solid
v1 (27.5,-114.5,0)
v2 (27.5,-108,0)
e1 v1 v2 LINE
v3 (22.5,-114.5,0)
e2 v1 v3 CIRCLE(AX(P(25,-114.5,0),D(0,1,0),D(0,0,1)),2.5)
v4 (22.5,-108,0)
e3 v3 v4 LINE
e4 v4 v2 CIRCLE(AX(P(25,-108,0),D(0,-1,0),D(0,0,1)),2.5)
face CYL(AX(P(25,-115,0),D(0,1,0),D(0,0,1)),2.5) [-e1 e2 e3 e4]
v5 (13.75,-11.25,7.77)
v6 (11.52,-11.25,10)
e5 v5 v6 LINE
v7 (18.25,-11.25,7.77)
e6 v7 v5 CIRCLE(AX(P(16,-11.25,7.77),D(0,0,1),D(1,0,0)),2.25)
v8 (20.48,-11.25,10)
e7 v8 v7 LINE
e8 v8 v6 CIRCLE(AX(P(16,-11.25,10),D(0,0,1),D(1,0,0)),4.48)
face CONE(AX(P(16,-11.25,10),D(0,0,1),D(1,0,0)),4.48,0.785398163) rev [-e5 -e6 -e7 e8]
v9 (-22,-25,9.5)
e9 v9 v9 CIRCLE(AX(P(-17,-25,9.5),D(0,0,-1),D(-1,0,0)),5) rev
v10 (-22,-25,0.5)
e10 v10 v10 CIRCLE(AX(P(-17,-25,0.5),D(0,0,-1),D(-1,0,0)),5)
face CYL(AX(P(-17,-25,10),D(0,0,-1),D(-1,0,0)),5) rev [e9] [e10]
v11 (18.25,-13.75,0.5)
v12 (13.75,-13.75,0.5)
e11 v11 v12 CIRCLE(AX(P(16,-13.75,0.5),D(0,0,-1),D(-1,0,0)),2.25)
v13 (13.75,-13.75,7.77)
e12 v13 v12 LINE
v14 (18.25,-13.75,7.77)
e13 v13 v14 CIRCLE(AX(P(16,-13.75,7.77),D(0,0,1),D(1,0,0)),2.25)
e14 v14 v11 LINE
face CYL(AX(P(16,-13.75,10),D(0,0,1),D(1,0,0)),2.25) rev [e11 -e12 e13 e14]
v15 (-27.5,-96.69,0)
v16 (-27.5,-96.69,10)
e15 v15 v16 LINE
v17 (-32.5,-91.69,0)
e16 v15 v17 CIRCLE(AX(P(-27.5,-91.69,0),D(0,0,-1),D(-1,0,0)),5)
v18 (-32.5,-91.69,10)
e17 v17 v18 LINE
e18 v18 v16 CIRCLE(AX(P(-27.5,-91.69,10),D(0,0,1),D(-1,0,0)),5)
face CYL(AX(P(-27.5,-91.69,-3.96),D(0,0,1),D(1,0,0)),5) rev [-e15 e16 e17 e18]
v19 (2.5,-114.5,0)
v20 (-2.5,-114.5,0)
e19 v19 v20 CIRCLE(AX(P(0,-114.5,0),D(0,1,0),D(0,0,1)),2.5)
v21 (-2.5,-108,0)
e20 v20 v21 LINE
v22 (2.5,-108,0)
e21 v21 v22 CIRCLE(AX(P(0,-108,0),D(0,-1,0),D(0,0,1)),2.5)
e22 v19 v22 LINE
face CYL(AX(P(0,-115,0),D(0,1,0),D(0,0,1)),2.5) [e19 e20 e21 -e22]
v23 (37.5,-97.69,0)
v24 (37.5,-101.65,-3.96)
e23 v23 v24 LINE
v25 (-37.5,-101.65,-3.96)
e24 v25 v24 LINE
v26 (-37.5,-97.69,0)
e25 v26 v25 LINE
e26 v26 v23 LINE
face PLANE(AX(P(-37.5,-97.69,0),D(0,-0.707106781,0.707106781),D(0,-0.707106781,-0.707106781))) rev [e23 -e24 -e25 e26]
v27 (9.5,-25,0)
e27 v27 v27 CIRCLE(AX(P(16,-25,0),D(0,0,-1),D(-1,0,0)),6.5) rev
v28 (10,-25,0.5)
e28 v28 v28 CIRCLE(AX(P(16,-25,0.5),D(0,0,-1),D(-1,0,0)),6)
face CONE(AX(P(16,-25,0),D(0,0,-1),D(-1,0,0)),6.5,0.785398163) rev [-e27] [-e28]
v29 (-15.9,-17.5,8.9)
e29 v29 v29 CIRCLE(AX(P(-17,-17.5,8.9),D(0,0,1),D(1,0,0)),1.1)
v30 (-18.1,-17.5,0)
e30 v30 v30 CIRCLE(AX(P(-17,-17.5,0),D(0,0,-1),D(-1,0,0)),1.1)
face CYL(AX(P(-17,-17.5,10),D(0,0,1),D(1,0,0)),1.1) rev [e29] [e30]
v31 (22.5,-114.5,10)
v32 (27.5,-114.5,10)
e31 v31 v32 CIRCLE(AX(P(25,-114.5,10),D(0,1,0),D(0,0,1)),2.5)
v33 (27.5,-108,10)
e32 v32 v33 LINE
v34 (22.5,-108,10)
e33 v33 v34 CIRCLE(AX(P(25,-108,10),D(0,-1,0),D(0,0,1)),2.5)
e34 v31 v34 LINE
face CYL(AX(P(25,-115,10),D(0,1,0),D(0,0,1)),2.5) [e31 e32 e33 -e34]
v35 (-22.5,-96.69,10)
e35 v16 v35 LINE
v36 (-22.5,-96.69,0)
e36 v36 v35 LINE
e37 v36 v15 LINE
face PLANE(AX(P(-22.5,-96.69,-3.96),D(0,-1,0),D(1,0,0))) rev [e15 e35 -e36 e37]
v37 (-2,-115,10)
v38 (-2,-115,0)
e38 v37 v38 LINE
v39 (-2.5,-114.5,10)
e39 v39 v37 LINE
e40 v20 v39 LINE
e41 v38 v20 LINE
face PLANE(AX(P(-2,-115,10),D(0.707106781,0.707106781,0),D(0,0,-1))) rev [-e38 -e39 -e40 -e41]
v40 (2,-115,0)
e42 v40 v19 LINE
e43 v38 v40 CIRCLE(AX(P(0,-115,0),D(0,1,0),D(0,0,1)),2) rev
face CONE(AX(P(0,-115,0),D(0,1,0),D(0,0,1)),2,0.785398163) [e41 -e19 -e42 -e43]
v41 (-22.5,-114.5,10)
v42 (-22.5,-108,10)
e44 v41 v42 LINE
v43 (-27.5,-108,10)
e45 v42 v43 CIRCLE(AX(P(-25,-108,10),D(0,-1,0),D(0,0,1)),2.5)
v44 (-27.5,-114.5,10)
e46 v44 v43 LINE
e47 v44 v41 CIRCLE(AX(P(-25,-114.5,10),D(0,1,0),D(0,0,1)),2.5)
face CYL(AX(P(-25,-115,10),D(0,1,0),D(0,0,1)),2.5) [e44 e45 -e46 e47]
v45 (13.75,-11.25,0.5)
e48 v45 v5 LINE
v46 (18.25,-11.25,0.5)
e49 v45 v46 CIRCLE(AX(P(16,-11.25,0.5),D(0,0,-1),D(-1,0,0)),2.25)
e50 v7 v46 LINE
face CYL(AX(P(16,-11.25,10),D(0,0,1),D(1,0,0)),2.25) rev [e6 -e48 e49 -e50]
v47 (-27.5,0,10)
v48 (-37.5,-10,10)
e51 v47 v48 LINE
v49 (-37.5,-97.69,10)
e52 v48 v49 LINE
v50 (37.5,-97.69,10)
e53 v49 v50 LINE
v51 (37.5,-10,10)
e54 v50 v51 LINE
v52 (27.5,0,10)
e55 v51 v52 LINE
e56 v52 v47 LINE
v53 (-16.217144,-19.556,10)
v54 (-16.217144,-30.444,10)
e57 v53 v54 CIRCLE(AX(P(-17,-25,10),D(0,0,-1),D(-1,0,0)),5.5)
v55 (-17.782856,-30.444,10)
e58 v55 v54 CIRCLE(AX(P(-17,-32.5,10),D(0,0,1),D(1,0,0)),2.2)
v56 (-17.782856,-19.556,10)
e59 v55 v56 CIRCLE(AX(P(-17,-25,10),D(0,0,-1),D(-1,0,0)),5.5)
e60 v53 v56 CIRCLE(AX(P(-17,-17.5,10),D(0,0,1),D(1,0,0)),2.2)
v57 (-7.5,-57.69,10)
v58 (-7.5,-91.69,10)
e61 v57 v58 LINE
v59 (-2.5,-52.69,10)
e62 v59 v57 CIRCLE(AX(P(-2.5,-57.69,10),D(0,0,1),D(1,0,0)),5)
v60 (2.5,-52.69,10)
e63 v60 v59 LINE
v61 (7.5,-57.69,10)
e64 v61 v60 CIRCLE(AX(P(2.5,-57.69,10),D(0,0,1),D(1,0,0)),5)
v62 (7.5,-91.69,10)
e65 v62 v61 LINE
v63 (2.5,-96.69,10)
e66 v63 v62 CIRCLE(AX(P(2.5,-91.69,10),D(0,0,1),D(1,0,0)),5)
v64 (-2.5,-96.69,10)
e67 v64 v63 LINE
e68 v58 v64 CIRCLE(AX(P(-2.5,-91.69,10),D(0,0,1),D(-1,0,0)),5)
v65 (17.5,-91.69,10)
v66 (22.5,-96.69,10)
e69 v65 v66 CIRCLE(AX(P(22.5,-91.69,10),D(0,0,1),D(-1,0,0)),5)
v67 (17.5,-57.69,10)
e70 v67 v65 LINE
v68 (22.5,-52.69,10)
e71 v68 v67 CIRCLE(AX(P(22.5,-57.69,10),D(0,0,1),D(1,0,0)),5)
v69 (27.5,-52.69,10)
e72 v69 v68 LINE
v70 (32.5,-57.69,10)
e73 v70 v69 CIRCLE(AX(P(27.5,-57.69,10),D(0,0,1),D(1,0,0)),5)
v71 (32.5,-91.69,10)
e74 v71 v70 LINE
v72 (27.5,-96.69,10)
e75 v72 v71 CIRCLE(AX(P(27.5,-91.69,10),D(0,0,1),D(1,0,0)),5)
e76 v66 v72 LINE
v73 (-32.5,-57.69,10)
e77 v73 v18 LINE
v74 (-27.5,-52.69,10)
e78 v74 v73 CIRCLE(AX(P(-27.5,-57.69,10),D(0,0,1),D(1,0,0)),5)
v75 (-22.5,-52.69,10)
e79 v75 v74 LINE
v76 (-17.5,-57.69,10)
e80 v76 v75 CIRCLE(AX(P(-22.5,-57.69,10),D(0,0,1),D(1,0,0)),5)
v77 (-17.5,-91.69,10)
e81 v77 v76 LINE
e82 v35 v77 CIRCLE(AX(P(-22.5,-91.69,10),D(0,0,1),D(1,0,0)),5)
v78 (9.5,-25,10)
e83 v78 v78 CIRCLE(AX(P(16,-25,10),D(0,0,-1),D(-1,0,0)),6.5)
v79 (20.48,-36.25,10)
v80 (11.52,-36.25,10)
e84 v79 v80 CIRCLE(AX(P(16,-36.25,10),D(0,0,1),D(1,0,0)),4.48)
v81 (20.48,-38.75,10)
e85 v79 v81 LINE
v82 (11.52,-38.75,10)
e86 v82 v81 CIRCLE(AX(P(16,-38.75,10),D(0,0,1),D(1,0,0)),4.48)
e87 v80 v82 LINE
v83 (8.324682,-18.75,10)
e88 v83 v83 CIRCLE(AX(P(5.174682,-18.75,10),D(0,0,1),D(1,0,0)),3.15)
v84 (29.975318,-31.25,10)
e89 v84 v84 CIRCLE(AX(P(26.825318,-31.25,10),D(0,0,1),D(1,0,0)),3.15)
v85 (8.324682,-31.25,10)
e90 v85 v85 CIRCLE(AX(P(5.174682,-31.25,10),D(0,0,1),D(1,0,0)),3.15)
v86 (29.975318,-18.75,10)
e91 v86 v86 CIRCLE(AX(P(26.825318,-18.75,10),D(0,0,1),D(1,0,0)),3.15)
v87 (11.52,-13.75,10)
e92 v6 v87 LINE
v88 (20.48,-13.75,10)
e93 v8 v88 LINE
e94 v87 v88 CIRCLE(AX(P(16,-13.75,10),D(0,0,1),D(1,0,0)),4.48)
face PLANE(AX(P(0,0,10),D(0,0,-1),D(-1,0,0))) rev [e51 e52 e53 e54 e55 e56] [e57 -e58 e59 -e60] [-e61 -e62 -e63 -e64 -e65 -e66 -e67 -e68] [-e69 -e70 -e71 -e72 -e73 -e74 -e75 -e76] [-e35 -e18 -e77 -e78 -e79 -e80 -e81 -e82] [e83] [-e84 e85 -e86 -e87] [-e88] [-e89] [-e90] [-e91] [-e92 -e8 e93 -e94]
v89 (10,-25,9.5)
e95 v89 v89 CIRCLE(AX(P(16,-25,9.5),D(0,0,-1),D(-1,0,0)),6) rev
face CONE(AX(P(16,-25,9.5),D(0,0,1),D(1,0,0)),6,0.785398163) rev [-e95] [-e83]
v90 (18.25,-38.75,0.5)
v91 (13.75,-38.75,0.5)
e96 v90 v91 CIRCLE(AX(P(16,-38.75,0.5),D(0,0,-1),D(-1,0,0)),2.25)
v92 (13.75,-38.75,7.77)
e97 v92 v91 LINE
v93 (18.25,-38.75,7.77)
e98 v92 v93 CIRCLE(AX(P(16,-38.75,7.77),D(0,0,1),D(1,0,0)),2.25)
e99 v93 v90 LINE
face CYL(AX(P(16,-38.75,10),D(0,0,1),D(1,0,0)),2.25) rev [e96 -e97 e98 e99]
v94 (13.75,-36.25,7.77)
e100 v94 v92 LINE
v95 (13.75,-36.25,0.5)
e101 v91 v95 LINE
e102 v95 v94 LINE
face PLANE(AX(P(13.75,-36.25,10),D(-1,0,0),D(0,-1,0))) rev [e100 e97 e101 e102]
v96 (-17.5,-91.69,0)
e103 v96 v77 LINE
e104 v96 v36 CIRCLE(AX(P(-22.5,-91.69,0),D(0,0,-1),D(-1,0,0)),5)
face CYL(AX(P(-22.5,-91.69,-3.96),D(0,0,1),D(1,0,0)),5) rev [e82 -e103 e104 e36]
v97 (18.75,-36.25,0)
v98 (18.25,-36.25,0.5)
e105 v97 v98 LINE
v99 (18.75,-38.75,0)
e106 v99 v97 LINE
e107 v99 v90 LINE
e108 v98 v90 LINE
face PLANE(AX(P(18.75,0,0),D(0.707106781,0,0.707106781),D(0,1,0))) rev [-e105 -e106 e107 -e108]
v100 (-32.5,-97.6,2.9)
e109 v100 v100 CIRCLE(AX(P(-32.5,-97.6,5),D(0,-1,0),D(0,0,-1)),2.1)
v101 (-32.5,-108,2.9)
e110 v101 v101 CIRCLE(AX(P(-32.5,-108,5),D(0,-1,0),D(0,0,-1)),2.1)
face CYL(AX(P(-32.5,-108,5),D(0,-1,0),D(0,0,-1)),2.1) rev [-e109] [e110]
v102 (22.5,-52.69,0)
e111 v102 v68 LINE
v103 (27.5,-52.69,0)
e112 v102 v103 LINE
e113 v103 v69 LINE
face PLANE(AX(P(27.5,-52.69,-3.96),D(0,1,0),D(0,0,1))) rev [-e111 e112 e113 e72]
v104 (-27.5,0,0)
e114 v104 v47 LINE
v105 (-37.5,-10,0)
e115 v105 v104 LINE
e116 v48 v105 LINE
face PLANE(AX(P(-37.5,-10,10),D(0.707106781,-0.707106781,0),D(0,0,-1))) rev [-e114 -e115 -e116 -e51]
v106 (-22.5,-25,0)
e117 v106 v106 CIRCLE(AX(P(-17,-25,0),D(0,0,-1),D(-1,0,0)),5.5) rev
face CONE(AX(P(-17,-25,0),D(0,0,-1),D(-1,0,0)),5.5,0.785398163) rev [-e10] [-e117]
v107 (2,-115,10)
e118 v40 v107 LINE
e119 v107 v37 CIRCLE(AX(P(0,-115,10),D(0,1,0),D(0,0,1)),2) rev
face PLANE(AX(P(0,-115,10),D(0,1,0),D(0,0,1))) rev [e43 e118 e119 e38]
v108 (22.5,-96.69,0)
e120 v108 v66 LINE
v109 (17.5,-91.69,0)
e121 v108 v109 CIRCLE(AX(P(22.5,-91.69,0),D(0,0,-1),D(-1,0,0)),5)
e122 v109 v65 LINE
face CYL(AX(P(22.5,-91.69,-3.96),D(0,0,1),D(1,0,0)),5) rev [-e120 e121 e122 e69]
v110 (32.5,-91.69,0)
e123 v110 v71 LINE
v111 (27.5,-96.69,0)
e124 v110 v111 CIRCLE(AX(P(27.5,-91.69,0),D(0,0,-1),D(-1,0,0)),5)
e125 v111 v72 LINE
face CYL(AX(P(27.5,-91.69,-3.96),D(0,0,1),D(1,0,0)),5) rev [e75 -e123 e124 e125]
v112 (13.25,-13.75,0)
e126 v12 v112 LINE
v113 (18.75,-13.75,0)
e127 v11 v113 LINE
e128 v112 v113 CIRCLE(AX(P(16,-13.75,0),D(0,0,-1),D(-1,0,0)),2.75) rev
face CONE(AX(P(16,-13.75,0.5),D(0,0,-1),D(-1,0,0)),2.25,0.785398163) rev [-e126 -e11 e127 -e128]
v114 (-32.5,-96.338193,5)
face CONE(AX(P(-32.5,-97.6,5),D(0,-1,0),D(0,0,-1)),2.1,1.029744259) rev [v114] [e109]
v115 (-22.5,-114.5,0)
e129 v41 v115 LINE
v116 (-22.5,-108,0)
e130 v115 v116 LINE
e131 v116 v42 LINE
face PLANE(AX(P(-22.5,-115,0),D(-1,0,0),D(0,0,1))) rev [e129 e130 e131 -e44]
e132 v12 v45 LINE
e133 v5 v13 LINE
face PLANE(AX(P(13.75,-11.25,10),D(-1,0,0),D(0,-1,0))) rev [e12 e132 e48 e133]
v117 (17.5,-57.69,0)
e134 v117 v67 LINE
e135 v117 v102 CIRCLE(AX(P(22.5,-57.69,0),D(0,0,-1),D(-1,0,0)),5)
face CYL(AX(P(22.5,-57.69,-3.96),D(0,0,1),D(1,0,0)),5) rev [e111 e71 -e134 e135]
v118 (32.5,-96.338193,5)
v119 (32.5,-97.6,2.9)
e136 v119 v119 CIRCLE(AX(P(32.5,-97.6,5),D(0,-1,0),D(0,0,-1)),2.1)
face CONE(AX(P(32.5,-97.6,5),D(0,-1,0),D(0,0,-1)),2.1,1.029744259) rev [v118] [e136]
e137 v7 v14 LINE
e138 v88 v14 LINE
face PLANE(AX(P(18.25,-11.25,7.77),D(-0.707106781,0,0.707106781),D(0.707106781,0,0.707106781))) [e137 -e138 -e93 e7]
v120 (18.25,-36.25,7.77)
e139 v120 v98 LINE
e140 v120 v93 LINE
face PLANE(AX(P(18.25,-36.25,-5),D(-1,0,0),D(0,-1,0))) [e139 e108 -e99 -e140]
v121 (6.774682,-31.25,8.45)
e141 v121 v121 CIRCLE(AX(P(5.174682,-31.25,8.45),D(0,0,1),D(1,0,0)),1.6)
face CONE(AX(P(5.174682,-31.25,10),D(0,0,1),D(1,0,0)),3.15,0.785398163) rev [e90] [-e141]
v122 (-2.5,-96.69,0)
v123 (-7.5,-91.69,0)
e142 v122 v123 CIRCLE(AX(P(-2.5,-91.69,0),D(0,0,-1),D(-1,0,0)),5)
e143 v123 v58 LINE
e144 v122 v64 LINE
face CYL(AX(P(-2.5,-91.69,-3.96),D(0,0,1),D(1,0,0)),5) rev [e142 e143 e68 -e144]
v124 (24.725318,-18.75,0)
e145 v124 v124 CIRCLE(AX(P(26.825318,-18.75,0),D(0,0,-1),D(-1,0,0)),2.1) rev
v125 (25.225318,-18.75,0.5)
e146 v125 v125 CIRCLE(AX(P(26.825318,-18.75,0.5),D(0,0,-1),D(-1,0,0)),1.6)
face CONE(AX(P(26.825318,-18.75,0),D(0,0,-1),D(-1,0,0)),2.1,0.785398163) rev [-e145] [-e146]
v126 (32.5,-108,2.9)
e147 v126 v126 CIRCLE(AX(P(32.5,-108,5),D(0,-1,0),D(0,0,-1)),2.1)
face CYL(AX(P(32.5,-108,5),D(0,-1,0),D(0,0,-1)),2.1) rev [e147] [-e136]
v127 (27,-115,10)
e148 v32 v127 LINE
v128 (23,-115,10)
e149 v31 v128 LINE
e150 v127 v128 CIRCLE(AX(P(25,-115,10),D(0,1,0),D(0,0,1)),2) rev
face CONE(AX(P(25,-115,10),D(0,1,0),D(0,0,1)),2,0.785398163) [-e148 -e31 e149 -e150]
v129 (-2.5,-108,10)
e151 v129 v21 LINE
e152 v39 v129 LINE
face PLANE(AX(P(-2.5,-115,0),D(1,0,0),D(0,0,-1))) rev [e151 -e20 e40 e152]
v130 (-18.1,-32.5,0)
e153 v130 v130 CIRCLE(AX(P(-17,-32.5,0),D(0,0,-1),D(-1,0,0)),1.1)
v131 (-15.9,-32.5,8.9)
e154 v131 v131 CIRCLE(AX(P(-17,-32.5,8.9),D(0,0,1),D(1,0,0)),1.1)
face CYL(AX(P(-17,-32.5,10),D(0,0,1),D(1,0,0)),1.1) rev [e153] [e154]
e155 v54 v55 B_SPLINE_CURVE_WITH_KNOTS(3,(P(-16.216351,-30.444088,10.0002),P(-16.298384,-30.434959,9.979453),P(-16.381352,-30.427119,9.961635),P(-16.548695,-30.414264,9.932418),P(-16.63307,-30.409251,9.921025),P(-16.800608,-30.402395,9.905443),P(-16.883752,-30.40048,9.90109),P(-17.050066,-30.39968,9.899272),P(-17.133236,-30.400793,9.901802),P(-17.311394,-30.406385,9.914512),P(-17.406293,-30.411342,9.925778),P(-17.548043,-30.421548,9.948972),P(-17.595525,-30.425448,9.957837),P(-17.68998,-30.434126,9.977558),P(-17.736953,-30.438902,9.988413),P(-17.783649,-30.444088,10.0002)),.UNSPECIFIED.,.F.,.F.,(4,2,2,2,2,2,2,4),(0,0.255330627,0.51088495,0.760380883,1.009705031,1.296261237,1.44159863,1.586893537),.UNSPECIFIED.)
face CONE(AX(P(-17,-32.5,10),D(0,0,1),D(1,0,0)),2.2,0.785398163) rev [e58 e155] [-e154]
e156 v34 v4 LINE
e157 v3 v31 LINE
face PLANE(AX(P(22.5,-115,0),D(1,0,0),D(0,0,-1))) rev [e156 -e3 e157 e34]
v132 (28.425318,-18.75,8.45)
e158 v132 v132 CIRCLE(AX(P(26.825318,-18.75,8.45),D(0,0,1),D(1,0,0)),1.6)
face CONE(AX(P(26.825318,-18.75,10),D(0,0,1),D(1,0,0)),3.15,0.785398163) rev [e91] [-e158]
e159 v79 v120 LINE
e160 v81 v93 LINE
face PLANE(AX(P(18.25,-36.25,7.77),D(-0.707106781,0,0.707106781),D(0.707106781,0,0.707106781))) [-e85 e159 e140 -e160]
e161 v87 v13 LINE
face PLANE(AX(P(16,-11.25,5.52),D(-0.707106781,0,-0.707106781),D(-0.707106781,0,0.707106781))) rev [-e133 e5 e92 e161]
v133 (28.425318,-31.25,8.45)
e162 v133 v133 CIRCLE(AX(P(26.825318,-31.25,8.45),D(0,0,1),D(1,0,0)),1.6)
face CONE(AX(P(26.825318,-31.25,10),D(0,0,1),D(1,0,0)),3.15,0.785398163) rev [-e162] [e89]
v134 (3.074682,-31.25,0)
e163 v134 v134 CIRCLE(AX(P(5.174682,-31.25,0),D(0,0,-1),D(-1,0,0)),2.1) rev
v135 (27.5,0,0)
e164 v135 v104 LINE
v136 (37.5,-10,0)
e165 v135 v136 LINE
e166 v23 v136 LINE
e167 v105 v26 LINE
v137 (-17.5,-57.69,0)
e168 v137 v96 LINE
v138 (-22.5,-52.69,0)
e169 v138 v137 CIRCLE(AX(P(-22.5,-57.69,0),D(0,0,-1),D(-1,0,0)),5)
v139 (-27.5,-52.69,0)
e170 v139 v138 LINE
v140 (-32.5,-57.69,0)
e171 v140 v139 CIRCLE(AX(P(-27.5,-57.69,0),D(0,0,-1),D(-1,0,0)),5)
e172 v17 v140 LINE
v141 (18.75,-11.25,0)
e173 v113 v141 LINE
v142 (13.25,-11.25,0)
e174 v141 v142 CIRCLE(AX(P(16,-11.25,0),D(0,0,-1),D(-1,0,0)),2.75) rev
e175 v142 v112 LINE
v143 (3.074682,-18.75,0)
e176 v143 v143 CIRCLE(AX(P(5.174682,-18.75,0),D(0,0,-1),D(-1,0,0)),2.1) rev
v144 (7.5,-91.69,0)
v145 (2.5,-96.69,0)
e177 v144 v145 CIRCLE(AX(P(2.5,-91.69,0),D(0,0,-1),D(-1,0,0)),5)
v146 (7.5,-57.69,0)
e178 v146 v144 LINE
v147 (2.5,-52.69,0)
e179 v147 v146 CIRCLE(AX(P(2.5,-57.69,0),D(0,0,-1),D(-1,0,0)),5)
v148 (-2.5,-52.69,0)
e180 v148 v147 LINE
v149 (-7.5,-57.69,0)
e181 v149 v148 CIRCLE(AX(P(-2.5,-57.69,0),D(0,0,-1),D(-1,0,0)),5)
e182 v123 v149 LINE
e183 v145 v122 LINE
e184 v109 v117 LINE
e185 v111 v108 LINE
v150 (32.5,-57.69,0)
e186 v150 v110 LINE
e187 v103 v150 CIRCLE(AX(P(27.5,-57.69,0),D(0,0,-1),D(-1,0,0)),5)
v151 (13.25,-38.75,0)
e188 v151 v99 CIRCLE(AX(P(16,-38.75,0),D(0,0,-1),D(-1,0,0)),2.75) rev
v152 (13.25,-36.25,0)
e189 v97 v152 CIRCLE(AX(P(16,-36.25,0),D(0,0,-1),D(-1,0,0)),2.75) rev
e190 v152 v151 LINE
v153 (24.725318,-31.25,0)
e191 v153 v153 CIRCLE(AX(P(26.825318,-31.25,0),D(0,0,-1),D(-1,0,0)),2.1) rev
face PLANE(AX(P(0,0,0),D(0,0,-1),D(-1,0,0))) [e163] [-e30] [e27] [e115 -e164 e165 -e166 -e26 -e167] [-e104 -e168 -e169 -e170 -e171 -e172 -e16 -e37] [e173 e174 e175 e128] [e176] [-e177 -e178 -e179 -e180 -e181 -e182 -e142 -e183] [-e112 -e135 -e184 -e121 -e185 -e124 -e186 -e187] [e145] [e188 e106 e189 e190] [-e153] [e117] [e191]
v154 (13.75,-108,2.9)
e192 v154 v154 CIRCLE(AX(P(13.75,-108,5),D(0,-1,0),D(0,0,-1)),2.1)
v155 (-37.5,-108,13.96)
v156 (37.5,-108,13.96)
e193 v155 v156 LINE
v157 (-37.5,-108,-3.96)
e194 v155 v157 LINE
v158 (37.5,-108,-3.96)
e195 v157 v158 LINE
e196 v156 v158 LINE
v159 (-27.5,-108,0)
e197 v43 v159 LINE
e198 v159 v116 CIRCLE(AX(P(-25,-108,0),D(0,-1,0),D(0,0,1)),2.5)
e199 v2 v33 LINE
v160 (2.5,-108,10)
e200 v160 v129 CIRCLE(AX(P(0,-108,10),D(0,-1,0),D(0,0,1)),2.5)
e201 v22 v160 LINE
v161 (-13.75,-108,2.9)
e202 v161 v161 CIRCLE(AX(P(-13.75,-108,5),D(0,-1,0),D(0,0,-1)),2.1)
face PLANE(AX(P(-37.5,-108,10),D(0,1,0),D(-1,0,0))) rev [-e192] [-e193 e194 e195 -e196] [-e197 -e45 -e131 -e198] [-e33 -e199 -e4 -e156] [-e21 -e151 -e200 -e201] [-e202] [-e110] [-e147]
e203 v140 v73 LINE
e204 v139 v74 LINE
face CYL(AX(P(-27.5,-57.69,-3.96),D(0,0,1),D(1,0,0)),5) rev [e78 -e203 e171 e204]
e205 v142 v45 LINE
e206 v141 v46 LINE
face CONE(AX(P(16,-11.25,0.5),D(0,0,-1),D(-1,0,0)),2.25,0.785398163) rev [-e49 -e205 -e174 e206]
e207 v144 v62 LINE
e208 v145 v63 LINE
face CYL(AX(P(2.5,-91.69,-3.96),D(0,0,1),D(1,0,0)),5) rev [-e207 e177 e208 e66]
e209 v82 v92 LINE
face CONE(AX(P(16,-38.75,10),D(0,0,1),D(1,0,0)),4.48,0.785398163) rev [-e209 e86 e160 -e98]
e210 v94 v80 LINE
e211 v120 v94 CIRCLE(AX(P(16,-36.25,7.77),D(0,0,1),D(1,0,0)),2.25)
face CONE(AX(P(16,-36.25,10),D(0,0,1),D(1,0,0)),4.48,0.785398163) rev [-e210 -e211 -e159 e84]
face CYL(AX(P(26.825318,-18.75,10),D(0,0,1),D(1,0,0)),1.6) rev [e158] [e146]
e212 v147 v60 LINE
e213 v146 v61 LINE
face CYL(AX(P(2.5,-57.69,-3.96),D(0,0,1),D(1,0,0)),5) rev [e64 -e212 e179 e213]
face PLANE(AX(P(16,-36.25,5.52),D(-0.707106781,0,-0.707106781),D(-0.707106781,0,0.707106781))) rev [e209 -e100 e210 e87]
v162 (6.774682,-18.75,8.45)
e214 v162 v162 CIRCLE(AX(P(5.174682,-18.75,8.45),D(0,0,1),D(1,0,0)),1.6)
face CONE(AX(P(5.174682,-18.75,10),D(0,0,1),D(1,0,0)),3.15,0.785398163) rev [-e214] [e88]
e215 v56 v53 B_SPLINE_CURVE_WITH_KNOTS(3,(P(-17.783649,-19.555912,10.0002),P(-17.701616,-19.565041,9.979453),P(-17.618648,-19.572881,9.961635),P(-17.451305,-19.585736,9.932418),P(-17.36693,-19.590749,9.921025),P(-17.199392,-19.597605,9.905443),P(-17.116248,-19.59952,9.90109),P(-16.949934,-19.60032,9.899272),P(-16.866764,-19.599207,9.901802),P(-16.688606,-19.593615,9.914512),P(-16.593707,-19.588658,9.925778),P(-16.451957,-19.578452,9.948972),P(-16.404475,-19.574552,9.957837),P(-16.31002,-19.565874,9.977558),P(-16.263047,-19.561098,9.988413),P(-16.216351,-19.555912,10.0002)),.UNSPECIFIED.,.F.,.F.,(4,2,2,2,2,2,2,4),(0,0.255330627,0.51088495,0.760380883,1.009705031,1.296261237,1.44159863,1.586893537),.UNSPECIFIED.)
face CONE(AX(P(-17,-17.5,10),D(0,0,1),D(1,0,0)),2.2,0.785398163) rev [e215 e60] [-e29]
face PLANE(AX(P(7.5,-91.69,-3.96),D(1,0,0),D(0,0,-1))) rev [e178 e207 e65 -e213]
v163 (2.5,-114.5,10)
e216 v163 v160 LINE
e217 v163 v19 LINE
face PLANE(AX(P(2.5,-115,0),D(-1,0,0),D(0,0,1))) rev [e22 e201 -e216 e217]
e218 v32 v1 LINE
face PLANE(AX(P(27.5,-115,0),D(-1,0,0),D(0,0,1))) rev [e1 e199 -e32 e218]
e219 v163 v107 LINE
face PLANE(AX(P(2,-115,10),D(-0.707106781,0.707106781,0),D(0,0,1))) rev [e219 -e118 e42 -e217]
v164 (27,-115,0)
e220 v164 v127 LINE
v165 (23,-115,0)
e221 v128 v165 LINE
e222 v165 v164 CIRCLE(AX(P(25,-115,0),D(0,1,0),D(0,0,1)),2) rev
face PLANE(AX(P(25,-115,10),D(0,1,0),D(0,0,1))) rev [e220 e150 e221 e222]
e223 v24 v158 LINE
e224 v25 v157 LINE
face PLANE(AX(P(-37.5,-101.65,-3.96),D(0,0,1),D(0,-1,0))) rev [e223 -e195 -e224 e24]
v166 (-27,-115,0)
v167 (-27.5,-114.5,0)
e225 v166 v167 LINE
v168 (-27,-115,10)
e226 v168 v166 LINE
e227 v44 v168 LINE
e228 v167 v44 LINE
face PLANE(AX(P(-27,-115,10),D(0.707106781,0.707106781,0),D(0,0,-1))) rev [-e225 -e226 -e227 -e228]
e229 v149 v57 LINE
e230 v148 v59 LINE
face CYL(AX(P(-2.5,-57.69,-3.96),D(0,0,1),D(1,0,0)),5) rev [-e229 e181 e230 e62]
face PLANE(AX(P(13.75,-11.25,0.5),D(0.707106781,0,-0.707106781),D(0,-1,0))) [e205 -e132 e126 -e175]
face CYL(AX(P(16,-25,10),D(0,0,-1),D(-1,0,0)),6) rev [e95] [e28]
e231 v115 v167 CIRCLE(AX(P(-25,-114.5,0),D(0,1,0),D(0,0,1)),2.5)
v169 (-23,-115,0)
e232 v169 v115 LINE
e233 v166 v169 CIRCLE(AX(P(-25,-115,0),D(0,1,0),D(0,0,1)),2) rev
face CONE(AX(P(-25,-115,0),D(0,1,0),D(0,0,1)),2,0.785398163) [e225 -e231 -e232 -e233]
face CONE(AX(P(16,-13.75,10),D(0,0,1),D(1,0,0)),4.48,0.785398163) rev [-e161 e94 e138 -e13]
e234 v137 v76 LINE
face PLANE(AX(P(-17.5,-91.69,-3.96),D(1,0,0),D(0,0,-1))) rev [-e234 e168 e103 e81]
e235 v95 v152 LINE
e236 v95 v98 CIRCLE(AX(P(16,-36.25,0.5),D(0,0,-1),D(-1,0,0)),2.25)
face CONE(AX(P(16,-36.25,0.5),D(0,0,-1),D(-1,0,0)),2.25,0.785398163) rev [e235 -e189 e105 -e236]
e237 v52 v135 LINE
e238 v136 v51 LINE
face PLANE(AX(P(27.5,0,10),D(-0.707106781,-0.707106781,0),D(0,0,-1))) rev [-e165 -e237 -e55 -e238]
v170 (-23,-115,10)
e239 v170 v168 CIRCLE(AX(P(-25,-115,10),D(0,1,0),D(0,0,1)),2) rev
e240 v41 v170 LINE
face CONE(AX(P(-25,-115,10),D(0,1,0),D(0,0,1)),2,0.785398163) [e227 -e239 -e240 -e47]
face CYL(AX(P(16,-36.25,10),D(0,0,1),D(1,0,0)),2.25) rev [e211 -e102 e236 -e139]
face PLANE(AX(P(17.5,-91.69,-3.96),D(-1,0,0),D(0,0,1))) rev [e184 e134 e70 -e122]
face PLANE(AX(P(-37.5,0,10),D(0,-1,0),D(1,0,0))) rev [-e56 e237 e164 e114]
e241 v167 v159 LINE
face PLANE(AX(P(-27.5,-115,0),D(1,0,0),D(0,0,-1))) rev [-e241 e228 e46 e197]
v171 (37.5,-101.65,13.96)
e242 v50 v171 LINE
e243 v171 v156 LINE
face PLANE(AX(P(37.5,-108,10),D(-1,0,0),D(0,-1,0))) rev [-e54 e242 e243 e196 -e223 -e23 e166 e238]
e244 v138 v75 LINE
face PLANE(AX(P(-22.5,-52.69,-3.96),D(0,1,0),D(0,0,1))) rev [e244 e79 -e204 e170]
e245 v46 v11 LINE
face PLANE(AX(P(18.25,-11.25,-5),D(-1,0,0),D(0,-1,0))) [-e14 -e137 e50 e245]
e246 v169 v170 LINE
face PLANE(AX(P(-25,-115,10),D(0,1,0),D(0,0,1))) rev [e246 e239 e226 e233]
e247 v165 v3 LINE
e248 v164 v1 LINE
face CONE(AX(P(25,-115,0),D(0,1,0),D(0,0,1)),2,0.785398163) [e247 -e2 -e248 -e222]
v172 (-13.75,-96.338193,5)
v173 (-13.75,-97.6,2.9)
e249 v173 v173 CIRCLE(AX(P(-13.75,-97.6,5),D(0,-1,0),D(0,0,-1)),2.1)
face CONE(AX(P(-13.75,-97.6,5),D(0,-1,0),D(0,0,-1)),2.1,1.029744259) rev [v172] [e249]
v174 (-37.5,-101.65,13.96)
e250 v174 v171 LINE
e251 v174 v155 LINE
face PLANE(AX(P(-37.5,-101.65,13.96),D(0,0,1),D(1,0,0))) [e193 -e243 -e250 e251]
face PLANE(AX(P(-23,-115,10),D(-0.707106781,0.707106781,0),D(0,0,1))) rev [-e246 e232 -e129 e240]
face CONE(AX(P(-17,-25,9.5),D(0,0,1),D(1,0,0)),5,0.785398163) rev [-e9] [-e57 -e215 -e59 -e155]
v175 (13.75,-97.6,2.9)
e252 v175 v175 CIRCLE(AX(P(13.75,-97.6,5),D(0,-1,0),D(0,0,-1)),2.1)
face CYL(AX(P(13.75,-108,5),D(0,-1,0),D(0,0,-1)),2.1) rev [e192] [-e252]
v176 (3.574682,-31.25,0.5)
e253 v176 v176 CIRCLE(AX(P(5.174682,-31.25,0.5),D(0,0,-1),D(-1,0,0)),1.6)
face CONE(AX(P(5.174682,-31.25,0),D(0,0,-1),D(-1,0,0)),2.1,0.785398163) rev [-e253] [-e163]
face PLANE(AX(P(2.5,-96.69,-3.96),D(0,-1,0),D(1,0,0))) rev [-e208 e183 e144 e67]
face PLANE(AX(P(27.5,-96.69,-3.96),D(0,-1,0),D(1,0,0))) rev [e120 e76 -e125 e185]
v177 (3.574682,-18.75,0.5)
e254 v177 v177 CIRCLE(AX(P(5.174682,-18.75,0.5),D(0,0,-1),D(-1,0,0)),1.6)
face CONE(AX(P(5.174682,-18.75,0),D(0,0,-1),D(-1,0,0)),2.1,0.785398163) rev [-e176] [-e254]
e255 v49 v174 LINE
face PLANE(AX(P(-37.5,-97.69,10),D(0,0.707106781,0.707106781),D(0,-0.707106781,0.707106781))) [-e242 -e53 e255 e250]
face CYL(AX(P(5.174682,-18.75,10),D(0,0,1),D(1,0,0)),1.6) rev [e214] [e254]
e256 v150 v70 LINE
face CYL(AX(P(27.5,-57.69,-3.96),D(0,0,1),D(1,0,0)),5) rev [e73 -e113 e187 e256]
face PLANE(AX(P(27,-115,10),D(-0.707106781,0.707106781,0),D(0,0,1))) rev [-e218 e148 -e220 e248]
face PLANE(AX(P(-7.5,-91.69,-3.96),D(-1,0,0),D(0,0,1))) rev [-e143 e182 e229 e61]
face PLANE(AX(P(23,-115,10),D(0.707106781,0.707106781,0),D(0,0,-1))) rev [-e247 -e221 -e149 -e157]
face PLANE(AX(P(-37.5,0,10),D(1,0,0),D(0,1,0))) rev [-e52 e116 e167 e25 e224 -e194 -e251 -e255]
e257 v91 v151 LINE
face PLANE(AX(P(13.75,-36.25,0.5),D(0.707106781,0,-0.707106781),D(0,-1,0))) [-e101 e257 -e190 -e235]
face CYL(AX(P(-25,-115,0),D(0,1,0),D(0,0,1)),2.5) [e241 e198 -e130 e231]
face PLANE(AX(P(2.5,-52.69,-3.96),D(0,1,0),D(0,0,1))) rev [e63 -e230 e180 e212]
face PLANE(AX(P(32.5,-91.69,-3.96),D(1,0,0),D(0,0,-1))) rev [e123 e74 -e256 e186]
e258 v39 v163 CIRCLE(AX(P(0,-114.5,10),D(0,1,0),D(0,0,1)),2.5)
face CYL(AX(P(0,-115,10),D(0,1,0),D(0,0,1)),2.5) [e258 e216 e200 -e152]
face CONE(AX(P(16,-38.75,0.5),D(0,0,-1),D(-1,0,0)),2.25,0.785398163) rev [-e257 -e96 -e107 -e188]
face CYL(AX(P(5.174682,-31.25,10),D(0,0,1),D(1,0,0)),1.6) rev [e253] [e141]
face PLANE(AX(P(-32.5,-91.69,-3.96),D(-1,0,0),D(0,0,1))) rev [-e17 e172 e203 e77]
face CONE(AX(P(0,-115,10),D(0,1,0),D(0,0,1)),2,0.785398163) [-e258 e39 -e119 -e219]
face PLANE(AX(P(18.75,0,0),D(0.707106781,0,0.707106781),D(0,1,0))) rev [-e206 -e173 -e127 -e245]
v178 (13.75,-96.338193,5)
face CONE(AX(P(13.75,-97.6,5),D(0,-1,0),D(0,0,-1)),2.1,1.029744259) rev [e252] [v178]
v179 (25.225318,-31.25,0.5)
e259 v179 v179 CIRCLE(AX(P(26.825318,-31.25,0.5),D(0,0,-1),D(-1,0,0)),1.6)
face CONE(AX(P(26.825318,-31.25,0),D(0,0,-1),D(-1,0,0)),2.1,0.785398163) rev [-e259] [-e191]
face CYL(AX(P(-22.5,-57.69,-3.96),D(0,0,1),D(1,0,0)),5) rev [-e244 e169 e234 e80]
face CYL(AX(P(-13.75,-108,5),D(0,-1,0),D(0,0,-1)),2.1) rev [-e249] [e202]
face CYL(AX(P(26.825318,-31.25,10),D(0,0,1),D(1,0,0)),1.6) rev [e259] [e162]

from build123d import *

# Parameters (mm, degrees)
SKETCH1_W                                       = 75
SKETCH1_H                                       = 108
BOSS_EXTRUDE1_DEPTH                             = 10
SKETCH2_R                                       = 6
SKETCH2_R_2                                     = 5
CUT_EXTRUDE2_DEPTH                              = 115.761709642
HOLE_WIZARD_M31_D                               = 3.2
HOLE_WIZARD_M31_CSINK_D                         = 6.3
HOLE_WIZARD_M31_CSINK_ANGLE                     = 90
BOSS_EXTRUDE2_DEPTH                             = 75
BOSS_EXTRUDE3_DEPTH                             = 7
CHAMFER2_SIZE                                   = 0.5
HOLE_WIZARD_M41_DEPTH                           = 10
CHAMFER4_SIZE                                   = 0.5
CUT_EXTRUDE3_DEPTH                              = 122.762603454
CSK_FOR_M2_FLAT_HEAD_MACHINE_SCREW1_D           = 2.2
CSK_FOR_M2_FLAT_HEAD_MACHINE_SCREW1_CSINK_D     = 4.4
CSK_FOR_M2_FLAT_HEAD_MACHINE_SCREW1_CSINK_ANGLE = 90
M5X0_8_TAPPED_HOLE1_D                           = 4.2
M5X0_8_TAPPED_HOLE1_DEPTH                       = 10.4
M5X0_8_TAPPED_HOLE1_TIP                         = 1.2618073
CHAMFER6_SIZE                                   = 10


with BuildPart() as part:
    # Sketch1 → Boss-Extrude1 (new body)
    with BuildSketch(Plane.XY):
        with Locations((0, -54)):
            Rectangle(SKETCH1_W, SKETCH1_H)
    extrude(amount=BOSS_EXTRUDE1_DEPTH)

    # Sketch2 → Cut-Extrude2 (cut, through all)
    with BuildSketch(Plane.XY):
        with Locations((16, -25)):
            Circle(SKETCH2_R)
        with Locations((-17, -25)):
            Circle(SKETCH2_R_2)
    extrude(amount=CUT_EXTRUDE2_DEPTH, mode=Mode.SUBTRACT)

    # Зенковка для  винта с плоской головкой M31 (through all)
    with Locations(Plane.XY.offset(10)):
        with Locations((26.825317547, -18.75), (5.174682453, -18.75), (5.174682453, -31.25), (26.825317547, -31.25)):
            CounterSinkHole(HOLE_WIZARD_M31_D / 2, HOLE_WIZARD_M31_CSINK_D / 2, counter_sink_angle=HOLE_WIZARD_M31_CSINK_ANGLE)

    # Sketch13 → Boss-Extrude2 (add, through all)
    with BuildSketch(Plane(origin=(37.5, 0, 0), x_dir=(0, 0, -1), z_dir=(1, 0, 0))):
        Polygon((-10, -97.69), (-13.96, -101.65), (-13.96, -108), (-10, -108), (0, -108), (3.96, -108), (3.96, -101.65), (0, -97.69), align=None)
    extrude(amount=-BOSS_EXTRUDE2_DEPTH)

    # Sketch14 → Boss-Extrude3 (add)
    with BuildSketch(Plane.XZ.offset(108)):
        with BuildLine():
            Line((-2.5, 0), (-2.5, 10))
            ThreePointArc((-2.5, 10), (0, 12.5), (2.5, 10))
            Line((2.5, 10), (2.5, 0))
            ThreePointArc((2.5, 0), (0, -2.5), (-2.5, 0))
        make_face()
        with BuildLine():
            Line((22.5, 0), (22.5, 10))
            ThreePointArc((22.5, 10), (25, 12.5), (27.5, 10))
            Line((27.5, 10), (27.5, 0))
            ThreePointArc((27.5, 0), (25, -2.5), (22.5, 0))
        make_face()
        with BuildLine():
            Line((-27.5, 0), (-27.5, 10))
            ThreePointArc((-27.5, 10), (-25, 12.5), (-22.5, 10))
            Line((-22.5, 10), (-22.5, 0))
            ThreePointArc((-22.5, 0), (-25, -2.5), (-27.5, 0))
        make_face()
    extrude(amount=BOSS_EXTRUDE3_DEPTH)

    # Chamfer2
    chamfer2_edges = [part.edges().sort_by_distance(p)[0] for p in [
        (-25, -115, 12.5),
        (-27.5, -115, 5),
        (-25, -115, -2.5),
        (-22.5, -115, 5),
        (0, -115, 12.5),
        (-2.5, -115, 5),
        (0, -115, -2.5),
        (2.5, -115, 5),
        (25, -115, 12.5),
        (22.5, -115, 5),
        (25, -115, -2.5),
        (27.5, -115, 5),
    ]]
    chamfer(chamfer2_edges, length=CHAMFER2_SIZE)

    # Зенковка для  винта с потайной головкой с внутренним шестигранником M41: read off the stored shape, not the designer's step
    # Зенковка для  винта с потайной головкой с внутренним шестигранником M41 outline → Зенковка для  винта с потайной головкой с внутренним шестигранником M41 (cut)
    with BuildSketch(Plane.XY):
        with BuildLine():
            Line((13.75, -36.25), (13.75, -38.75))
            ThreePointArc((13.75, -38.75), (16, -41), (18.25, -38.75))
            Line((18.25, -38.75), (18.25, -36.25))
            ThreePointArc((18.25, -36.25), (16, -34), (13.75, -36.25))
        make_face()
        with BuildLine():
            Line((18.25, -13.75), (18.25, -11.25))
            ThreePointArc((18.25, -11.25), (16, -9), (13.75, -11.25))
            Line((13.75, -11.25), (13.75, -13.75))
            ThreePointArc((13.75, -13.75), (16, -16), (18.25, -13.75))
        make_face()
    extrude(amount=HOLE_WIZARD_M41_DEPTH, mode=Mode.SUBTRACT)

    # Hole Wizard M41 2: loft between two sections, ruled curve by curve
    hole_wizard_m41_2_from = [
        Edge.make_three_point_arc((13.75, -38.75, 7.77), (14.409009742, -40.340990258, 7.77), (16, -41, 7.77)),
        Edge.make_three_point_arc((16, -41, 7.77), (17.590990258, -40.340990258, 7.77), (18.25, -38.75, 7.77)),
        Edge.make_three_point_arc((18.25, -36.25, 7.77), (17.590990258, -34.659009742, 7.77), (16, -34, 7.77)),
        Edge.make_three_point_arc((16, -34, 7.77), (14.409009742, -34.659009742, 7.77), (13.75, -36.25, 7.77)),
        Edge.make_line((18.25, -38.75, 7.77), (18.25, -36.25, 7.77)),
        Edge.make_line((13.75, -38.75, 7.77), (13.75, -36.25, 7.77)),
    ]
    hole_wizard_m41_2_to = [
        Edge.make_three_point_arc((11.52, -38.75, 10), (12.83216162, -41.91783838, 10), (16, -43.23, 10)),
        Edge.make_three_point_arc((16, -43.23, 10), (19.16783838, -41.91783838, 10), (20.48, -38.75, 10)),
        Edge.make_three_point_arc((20.48, -36.25, 10), (19.16783838, -33.08216162, 10), (16, -31.77, 10)),
        Edge.make_three_point_arc((16, -31.77, 10), (12.83216162, -33.08216162, 10), (11.52, -36.25, 10)),
        Edge.make_line((20.48, -38.75, 10), (20.48, -36.25, 10)),
        Edge.make_line((11.52, -38.75, 10), (11.52, -36.25, 10)),
    ]
    hole_wizard_m41_2 = Solid(Shell([*[Face.make_surface_from_curves(hole_wizard_m41_2_from[k], hole_wizard_m41_2_to[k]) for k in range(6)], Face(Wire(hole_wizard_m41_2_from)), Face(Wire(hole_wizard_m41_2_to))]))
    add(hole_wizard_m41_2, mode=Mode.SUBTRACT)

    # Hole Wizard M41 3: loft between two sections, ruled curve by curve
    hole_wizard_m41_3_from = [
        Edge.make_three_point_arc((13.75, -13.75, 7.77), (14.409009742, -15.340990258, 7.77), (16, -16, 7.77)),
        Edge.make_three_point_arc((16, -16, 7.77), (17.590990258, -15.340990258, 7.77), (18.25, -13.75, 7.77)),
        Edge.make_three_point_arc((18.25, -11.25, 7.77), (17.590990258, -9.659009742, 7.77), (16, -9, 7.77)),
        Edge.make_three_point_arc((16, -9, 7.77), (14.409009742, -9.659009742, 7.77), (13.75, -11.25, 7.77)),
        Edge.make_line((18.25, -13.75, 7.77), (18.25, -11.25, 7.77)),
        Edge.make_line((13.75, -13.75, 7.77), (13.75, -11.25, 7.77)),
    ]
    hole_wizard_m41_3_to = [
        Edge.make_three_point_arc((11.52, -13.75, 10), (12.83216162, -16.91783838, 10), (16, -18.23, 10)),
        Edge.make_three_point_arc((16, -18.23, 10), (19.16783838, -16.91783838, 10), (20.48, -13.75, 10)),
        Edge.make_three_point_arc((20.48, -11.25, 10), (19.16783838, -8.08216162, 10), (16, -6.77, 10)),
        Edge.make_three_point_arc((16, -6.77, 10), (12.83216162, -8.08216162, 10), (11.52, -11.25, 10)),
        Edge.make_line((20.48, -13.75, 10), (20.48, -11.25, 10)),
        Edge.make_line((11.52, -13.75, 10), (11.52, -11.25, 10)),
    ]
    hole_wizard_m41_3 = Solid(Shell([*[Face.make_surface_from_curves(hole_wizard_m41_3_from[k], hole_wizard_m41_3_to[k]) for k in range(6)], Face(Wire(hole_wizard_m41_3_from)), Face(Wire(hole_wizard_m41_3_to))]))
    add(hole_wizard_m41_3, mode=Mode.SUBTRACT)

    # Chamfer4
    chamfer4_edges = [part.edges().sort_by_distance(p)[0] for p in [
        (10, -25, 0),
        (10, -25, 10),
        (13.75, -37.5, 0),
        (16, -41, 0),
        (16, -34, 0),
        (18.25, -37.5, 0),
        (16, -9, 0),
        (18.25, -12.5, 0),
        (13.75, -12.5, 0),
        (16, -16, 0),
        (-22, -25, 0),
        (-22, -25, 10),
        (28.425317547, -31.25, 0),
        (6.774682453, -31.25, 0),
        (6.774682453, -18.75, 0),
        (28.425317547, -18.75, 0),
    ]]
    chamfer(chamfer4_edges, length=CHAMFER4_SIZE)

    # Sketch22 → Cut-Extrude3 (cut, through all)
    with BuildSketch(Plane.XY.offset(10)):
        with BuildLine():
            Line((2.5, -96.69), (-2.5, -96.69))
            ThreePointArc((-2.5, -96.69), (-6.035533906, -95.225533906), (-7.5, -91.69))
            Line((-7.5, -91.69), (-7.5, -57.69))
            ThreePointArc((-7.5, -57.69), (-6.035533906, -54.154466094), (-2.5, -52.69))
            Line((-2.5, -52.69), (2.5, -52.69))
            ThreePointArc((2.5, -52.69), (6.035533906, -54.154466094), (7.5, -57.69))
            Line((7.5, -57.69), (7.5, -91.69))
            ThreePointArc((7.5, -91.69), (6.035533906, -95.225533906), (2.5, -96.69))
        make_face()
        with BuildLine():
            Line((-22.5, -96.69), (-27.5, -96.69))
            ThreePointArc((-27.5, -96.69), (-31.035533906, -95.225533906), (-32.5, -91.69))
            Line((-32.5, -91.69), (-32.5, -57.69))
            ThreePointArc((-32.5, -57.69), (-31.035533906, -54.154466094), (-27.5, -52.69))
            Line((-27.5, -52.69), (-22.5, -52.69))
            ThreePointArc((-22.5, -52.69), (-18.964466094, -54.154466094), (-17.5, -57.69))
            Line((-17.5, -57.69), (-17.5, -91.69))
            ThreePointArc((-17.5, -91.69), (-18.964466094, -95.225533906), (-22.5, -96.69))
        make_face()
        with BuildLine():
            Line((27.5, -96.69), (22.5, -96.69))
            ThreePointArc((22.5, -96.69), (18.964466094, -95.225533906), (17.5, -91.69))
            Line((17.5, -91.69), (17.5, -57.69))
            ThreePointArc((17.5, -57.69), (18.964466094, -54.154466094), (22.5, -52.69))
            Line((22.5, -52.69), (27.5, -52.69))
            ThreePointArc((27.5, -52.69), (31.035533906, -54.154466094), (32.5, -57.69))
            Line((32.5, -57.69), (32.5, -91.69))
            ThreePointArc((32.5, -91.69), (31.035533906, -95.225533906), (27.5, -96.69))
        make_face()
    extrude(amount=-CUT_EXTRUDE3_DEPTH, mode=Mode.SUBTRACT)

    # CSK for M2 Flat Head Machine Screw1 (through all)
    with Locations(Plane.XY.offset(10)):
        with Locations((-17, -17.5), (-17, -32.5)):
            CounterSinkHole(CSK_FOR_M2_FLAT_HEAD_MACHINE_SCREW1_D / 2, CSK_FOR_M2_FLAT_HEAD_MACHINE_SCREW1_CSINK_D / 2, counter_sink_angle=CSK_FOR_M2_FLAT_HEAD_MACHINE_SCREW1_CSINK_ANGLE)

    # M5x0.8 Tapped Hole1
    with Locations(Plane(origin=(0, -108, 0), x_dir=(-1, 0, 0), z_dir=(0, -1, 0))):
        with Locations((32.5, -5), (13.75, -5), (-13.75, -5), (-32.5, -5)):
            Hole(M5X0_8_TAPPED_HOLE1_D / 2, depth=M5X0_8_TAPPED_HOLE1_DEPTH)
            with Locations((0, 0, -(M5X0_8_TAPPED_HOLE1_DEPTH + M5X0_8_TAPPED_HOLE1_TIP / 2))):  # 118° drill point
                Cone(0, M5X0_8_TAPPED_HOLE1_D / 2, M5X0_8_TAPPED_HOLE1_TIP, mode=Mode.SUBTRACT)

    # Chamfer6
    chamfer6_edges = [part.edges().sort_by_distance(p)[0] for p in [
        (-37.5, 0, 5),
        (37.5, 0, 5),
    ]]
    chamfer(chamfer6_edges, length=CHAMFER6_SIZE)


solid = part.part
